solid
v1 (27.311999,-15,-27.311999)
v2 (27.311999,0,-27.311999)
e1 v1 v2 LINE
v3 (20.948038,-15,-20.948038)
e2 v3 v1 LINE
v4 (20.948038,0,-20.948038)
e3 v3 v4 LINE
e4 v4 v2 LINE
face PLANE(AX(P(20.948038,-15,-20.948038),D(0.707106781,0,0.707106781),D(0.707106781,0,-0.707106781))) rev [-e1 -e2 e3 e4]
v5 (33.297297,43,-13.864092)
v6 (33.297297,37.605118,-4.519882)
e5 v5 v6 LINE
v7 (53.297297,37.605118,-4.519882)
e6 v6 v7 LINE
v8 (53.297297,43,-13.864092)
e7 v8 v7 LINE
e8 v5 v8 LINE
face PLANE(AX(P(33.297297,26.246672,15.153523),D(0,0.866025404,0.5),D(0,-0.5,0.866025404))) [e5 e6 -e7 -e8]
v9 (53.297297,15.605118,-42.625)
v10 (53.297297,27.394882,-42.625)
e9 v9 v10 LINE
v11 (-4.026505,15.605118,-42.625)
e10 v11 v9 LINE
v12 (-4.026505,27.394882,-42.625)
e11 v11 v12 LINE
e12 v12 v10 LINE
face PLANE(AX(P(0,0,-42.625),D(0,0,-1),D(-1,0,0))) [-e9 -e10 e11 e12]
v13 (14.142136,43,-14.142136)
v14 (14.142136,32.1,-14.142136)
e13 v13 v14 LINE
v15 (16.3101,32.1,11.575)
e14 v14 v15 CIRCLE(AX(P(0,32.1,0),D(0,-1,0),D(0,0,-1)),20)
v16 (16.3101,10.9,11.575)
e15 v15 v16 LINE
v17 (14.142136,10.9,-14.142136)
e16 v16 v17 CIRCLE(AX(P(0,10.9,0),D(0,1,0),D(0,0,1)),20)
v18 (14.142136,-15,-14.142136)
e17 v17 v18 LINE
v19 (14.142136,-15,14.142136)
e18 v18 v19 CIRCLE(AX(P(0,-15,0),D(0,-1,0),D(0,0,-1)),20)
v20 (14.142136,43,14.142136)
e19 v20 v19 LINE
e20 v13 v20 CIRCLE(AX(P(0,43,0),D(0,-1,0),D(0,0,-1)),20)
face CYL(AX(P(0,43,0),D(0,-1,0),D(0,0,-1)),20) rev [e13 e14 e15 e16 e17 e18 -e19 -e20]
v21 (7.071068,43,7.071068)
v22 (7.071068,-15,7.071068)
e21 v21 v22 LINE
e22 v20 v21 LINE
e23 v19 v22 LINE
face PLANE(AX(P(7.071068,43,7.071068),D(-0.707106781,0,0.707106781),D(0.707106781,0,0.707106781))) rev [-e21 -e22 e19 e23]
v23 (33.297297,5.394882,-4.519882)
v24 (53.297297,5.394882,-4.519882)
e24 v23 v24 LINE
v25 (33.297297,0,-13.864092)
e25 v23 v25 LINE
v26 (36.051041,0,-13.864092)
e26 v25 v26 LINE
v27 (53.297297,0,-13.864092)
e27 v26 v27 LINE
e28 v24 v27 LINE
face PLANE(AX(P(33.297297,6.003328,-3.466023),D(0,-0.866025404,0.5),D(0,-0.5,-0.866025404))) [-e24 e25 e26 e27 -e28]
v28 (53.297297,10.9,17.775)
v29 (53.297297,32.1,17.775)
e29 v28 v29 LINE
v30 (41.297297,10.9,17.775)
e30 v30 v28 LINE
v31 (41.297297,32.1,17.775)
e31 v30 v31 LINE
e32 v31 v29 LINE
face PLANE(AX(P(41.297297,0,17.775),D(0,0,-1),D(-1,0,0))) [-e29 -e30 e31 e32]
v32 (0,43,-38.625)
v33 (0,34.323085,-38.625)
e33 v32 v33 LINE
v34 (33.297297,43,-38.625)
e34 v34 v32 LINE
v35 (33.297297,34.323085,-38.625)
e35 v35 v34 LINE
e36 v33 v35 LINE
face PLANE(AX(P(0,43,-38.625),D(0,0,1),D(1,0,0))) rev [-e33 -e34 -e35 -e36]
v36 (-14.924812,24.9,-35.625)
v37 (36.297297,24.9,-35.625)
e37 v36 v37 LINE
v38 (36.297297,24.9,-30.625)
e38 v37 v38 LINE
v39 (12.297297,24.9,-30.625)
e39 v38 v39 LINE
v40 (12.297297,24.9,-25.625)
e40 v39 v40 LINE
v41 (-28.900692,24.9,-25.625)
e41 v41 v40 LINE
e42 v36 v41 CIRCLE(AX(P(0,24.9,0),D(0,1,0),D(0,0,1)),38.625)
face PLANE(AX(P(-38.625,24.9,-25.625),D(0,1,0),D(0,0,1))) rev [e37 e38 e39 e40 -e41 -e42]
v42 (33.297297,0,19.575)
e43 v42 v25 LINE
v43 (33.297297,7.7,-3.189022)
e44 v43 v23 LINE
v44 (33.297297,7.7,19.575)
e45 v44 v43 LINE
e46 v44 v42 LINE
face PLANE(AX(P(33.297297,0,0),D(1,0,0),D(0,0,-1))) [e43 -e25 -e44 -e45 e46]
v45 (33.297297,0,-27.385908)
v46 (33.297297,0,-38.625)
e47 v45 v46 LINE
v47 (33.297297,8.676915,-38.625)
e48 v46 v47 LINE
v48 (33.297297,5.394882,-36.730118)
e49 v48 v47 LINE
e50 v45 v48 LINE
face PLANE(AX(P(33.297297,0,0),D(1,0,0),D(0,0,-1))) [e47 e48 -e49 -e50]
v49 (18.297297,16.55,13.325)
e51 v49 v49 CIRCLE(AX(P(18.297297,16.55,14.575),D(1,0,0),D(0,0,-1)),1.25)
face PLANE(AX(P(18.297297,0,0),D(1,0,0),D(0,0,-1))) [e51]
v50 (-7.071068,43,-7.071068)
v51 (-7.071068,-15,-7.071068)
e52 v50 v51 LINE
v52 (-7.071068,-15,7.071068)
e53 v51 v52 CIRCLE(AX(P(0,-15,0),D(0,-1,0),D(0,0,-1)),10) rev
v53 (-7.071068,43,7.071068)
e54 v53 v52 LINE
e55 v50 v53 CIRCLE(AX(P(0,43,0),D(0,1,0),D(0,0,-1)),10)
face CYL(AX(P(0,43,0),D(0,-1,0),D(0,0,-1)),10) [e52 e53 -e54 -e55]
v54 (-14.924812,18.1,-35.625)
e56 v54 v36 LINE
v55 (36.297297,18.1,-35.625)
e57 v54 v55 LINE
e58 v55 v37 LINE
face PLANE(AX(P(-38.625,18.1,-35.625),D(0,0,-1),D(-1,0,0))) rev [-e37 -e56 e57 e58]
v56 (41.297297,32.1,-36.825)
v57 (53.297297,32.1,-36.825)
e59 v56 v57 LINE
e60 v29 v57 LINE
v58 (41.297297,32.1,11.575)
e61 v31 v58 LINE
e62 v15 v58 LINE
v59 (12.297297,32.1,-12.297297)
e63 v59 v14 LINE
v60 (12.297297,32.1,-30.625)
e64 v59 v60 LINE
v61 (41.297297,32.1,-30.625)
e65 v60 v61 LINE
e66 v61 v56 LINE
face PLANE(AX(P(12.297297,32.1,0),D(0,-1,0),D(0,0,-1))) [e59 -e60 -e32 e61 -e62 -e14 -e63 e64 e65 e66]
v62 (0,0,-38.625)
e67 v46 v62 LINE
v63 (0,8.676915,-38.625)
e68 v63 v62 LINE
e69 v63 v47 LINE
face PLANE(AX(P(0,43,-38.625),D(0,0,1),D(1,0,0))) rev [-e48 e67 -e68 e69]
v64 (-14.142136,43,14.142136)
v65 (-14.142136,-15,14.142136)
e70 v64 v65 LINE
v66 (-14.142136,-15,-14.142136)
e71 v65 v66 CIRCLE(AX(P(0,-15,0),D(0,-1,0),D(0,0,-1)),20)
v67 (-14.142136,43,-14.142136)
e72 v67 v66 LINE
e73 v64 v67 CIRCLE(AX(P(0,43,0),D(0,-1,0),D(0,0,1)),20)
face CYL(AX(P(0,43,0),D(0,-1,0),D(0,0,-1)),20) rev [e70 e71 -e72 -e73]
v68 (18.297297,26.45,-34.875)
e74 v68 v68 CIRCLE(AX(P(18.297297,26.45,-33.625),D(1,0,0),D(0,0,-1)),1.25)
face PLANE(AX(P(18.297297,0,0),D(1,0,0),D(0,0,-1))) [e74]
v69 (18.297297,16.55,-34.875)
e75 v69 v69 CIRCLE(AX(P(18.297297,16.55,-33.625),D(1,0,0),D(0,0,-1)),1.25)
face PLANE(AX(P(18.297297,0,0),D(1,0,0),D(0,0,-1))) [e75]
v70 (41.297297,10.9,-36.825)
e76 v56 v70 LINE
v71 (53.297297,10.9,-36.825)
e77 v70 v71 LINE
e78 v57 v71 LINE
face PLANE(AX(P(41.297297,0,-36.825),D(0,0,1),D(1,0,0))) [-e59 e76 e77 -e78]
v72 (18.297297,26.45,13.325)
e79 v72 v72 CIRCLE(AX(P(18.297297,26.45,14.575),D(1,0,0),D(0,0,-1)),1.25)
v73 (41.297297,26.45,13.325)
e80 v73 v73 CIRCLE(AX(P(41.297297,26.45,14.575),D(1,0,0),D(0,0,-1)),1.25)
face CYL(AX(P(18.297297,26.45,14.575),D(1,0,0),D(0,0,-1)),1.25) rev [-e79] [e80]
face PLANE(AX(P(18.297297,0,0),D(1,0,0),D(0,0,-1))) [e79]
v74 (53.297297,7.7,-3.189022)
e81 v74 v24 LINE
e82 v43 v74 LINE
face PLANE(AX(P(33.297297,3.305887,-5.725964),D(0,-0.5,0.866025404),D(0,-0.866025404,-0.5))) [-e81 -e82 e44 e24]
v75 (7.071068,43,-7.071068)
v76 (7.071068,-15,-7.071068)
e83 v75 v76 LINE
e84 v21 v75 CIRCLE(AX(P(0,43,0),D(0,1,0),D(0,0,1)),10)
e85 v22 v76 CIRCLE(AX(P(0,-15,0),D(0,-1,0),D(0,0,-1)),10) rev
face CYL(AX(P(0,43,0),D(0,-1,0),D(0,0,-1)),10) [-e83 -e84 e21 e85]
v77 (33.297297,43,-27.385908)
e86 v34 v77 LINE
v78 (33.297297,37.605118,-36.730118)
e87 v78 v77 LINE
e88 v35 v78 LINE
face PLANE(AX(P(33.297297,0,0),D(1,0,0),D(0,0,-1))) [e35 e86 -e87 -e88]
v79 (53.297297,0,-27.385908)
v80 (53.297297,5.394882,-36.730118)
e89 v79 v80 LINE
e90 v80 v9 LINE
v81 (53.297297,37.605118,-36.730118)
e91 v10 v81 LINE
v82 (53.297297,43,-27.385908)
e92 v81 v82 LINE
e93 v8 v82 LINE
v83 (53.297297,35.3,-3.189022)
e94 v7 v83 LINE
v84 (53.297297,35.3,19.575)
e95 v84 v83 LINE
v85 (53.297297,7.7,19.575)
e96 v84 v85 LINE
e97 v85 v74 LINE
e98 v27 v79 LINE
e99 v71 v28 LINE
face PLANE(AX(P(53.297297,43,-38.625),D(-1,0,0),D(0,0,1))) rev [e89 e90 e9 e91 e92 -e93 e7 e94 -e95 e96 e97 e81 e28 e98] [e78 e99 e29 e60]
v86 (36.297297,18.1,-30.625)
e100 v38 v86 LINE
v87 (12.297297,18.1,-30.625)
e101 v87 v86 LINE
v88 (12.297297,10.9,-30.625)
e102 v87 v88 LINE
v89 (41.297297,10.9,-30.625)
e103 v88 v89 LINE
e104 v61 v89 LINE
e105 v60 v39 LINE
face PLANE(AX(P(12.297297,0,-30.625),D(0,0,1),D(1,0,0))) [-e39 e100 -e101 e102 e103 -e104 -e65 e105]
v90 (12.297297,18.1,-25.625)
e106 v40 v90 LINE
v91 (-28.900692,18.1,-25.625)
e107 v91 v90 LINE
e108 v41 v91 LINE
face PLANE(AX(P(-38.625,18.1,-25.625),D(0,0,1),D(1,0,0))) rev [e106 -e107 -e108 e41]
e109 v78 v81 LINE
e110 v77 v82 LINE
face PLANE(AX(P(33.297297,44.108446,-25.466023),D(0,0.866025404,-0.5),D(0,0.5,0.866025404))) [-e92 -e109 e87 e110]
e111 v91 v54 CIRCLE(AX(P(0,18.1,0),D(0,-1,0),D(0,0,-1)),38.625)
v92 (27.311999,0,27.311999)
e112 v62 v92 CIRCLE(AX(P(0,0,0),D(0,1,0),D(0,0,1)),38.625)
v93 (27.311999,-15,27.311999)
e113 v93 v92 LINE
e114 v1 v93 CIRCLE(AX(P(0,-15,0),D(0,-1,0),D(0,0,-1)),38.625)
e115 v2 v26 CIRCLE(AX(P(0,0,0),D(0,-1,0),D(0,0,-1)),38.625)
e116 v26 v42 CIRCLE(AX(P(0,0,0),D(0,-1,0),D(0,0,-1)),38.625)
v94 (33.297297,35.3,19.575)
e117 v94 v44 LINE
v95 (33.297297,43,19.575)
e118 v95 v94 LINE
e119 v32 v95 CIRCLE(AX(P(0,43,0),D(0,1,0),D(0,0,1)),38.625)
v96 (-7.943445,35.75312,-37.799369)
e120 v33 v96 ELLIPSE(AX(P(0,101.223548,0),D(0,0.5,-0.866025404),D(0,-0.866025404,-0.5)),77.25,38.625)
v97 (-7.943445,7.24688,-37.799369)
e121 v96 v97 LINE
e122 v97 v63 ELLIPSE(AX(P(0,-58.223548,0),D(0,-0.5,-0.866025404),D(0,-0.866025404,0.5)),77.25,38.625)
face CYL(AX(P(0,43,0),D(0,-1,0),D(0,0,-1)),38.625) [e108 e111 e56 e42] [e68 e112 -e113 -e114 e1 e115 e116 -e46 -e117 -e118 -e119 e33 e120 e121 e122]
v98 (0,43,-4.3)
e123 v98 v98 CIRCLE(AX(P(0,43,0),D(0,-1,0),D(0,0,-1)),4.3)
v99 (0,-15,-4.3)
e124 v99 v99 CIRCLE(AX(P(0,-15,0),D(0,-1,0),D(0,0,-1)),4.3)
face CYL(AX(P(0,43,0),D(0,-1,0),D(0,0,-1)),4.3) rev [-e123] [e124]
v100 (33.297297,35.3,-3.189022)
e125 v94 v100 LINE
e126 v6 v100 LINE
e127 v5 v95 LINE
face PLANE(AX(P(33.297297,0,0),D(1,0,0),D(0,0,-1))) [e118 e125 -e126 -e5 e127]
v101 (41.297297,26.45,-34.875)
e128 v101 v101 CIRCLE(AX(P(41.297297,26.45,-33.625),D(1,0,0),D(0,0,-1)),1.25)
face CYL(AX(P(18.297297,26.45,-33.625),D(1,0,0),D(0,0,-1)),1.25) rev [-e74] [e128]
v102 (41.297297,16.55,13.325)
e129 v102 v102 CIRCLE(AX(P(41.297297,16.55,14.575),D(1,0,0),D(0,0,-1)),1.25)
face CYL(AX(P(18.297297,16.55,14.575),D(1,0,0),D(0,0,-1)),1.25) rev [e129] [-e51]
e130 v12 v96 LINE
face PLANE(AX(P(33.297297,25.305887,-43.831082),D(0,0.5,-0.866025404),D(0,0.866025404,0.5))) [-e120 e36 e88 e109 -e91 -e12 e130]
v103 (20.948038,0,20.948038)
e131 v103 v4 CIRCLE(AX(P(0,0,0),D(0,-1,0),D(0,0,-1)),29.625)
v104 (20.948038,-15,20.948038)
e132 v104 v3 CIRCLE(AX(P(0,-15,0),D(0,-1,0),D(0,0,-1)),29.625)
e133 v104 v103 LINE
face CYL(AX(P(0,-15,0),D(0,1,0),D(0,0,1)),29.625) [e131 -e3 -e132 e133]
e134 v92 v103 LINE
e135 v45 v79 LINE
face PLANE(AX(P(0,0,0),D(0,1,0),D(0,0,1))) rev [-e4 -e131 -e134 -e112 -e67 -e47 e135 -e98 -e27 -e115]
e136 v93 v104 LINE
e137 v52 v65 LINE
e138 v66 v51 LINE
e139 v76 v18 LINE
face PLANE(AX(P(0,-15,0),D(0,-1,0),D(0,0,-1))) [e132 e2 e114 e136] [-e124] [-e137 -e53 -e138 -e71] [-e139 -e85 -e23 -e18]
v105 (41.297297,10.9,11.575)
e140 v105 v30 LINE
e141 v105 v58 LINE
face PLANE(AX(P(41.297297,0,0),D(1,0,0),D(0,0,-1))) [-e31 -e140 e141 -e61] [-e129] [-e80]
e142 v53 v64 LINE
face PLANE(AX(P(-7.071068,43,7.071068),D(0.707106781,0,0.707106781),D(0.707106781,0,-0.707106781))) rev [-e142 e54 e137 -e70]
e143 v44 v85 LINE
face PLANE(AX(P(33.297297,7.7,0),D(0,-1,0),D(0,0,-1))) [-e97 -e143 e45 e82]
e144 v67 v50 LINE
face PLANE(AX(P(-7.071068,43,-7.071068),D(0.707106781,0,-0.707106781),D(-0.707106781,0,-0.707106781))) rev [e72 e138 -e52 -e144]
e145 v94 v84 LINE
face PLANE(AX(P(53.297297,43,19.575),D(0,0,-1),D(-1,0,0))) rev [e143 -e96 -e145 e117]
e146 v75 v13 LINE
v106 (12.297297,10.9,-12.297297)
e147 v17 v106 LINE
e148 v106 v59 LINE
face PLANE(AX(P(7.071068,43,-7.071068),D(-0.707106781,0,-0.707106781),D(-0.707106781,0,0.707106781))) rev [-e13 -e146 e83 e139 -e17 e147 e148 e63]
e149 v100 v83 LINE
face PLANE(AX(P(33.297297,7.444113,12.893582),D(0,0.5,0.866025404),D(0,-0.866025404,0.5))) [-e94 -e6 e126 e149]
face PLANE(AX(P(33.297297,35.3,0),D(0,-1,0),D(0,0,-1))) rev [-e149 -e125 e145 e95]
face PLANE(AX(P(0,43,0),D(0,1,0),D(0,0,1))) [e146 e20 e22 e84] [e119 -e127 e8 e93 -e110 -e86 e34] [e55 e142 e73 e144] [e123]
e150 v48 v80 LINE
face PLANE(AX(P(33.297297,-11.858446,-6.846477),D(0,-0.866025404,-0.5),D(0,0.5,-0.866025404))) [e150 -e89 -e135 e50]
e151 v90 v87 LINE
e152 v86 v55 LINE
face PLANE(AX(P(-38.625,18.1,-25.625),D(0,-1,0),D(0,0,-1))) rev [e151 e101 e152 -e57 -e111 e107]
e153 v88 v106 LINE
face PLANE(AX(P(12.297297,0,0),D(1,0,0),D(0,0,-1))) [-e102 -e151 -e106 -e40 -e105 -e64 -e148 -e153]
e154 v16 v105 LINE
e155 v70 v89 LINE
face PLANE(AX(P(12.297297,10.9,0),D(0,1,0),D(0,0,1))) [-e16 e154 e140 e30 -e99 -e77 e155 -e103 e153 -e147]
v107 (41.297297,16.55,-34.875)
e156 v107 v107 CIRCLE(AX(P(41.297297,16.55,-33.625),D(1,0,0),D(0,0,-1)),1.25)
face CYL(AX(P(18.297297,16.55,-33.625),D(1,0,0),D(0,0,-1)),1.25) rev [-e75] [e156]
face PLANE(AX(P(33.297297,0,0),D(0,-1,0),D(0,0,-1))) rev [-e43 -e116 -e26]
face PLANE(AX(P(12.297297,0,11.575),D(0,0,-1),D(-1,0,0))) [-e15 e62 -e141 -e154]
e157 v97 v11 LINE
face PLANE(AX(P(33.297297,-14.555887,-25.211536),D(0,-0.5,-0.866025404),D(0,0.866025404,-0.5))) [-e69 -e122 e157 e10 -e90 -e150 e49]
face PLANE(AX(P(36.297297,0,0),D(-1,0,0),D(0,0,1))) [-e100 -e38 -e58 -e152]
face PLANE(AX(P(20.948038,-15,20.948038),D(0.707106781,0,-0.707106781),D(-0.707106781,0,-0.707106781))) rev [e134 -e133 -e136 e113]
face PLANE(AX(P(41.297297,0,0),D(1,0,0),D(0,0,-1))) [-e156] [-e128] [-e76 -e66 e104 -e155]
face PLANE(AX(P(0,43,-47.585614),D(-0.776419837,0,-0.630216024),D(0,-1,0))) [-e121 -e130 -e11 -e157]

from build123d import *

# Parameters (mm, degrees)
BOSS_EXTRUDE1_DEPTH     = 43
BOSS_EXTRUDE2_START     = 15
BOSS_EXTRUDE2_DEPTH     = 15
SKETCH5_W               = 42.2
SKETCH5_H               = 21.2
CUT_EXTRUDE1_DEPTH      = 41
SKETCH5_5_W             = 6.2
SKETCH5_5_H             = 21.2
SKETCH5_5_R             = 1.25
CUT_EXTRUDE2_DEPTH      = 12
SKETCH5_6_R             = 1.25
CUT_EXTRUDE3_DEPTH      = 35
CUT_EXTRUDE4_DEPTH      = 88.729655833
CUT_EXTRUDE4_DEPTH_BACK = 88.729655833
SKETCH6_R               = 4.3
CUT_EXTRUDE5_START      = -5
SKETCH7_W               = 10
SKETCH7_H               = 6.8
CUT_EXTRUDE5_DEPTH      = 94.632977309
CUT_EXTRUDE9_DEPTH      = 20
BOSS_EXTRUDE3_DEPTH     = 53.297297


with BuildPart() as part:
    # Sketch1 → Boss-Extrude1 (new body)
    with BuildSketch(Plane(origin=(0, 0, 0), x_dir=(1, 0, 0), z_dir=(0, 1, 0))):
        with BuildLine():
            Line((0, 38.625), (53.297297188, 38.625))
            Line((53.297297188, 38.625), (53.297297188, -19.575))
            Line((53.297297188, -19.575), (33.297297188, -19.575))
            ThreePointArc((33.297297188, -19.575), (-33.525922806, -19.180800948), (0, 38.625))
        make_face()
    extrude(amount=BOSS_EXTRUDE1_DEPTH)

    # Sketch4 → Boss-Extrude2 (add)
    with BuildSketch(Plane.XZ.offset(BOSS_EXTRUDE2_START)):
        with BuildLine():
            Line((20.948038393, 20.948038393), (27.311999423, 27.311999423))
            ThreePointArc((27.311999423, 27.311999423), (38.625, 0), (27.311999423, -27.311999423))
            Line((27.311999423, -27.311999423), (20.948038393, -20.948038393))
            ThreePointArc((20.948038393, -20.948038393), (-29.625, 0), (20.948038393, 20.948038393))
        make_face()
    extrude(amount=-BOSS_EXTRUDE2_DEPTH)

    # Sketch5 → Cut-Extrude1 (cut)
    with BuildSketch(Plane(origin=(53.297297188, 0, 0), x_dir=(0, 0, -1), z_dir=(1, 0, 0))):
        with Locations((9.525, 21.5)):
            Rectangle(SKETCH5_W, SKETCH5_H)
    extrude(amount=-CUT_EXTRUDE1_DEPTH, mode=Mode.SUBTRACT)

    # Sketch5<5> → Cut-Extrude2 (cut)
    # profile 1 of 2: a face of its own
    with BuildSketch(Plane(origin=(53.297297188, 0, 0), x_dir=(0, 0, -1), z_dir=(1, 0, 0))):
        with Locations((-14.675, 21.5)):
            Rectangle(SKETCH5_5_W, SKETCH5_5_H)
        with Locations((-14.575, 16.55)):
            Circle(SKETCH5_5_R, mode=Mode.SUBTRACT)
        with Locations((-14.575, 26.45)):
            Circle(SKETCH5_5_R, mode=Mode.SUBTRACT)
    # profile 2 of 2: a face of its own
    with BuildSketch(Plane(origin=(53.297297188, 0, 0), x_dir=(0, 0, -1), z_dir=(1, 0, 0))):
        with Locations((33.725, 21.5)):
            Rectangle(SKETCH5_5_W, SKETCH5_5_H)
        with Locations((33.625, 26.45)):
            Circle(SKETCH5_5_R, mode=Mode.SUBTRACT)
        with Locations((33.625, 16.55)):
            Circle(SKETCH5_5_R, mode=Mode.SUBTRACT)
    extrude(amount=-CUT_EXTRUDE2_DEPTH, mode=Mode.SUBTRACT)

    # Sketch5<6> → Cut-Extrude3 (cut)
    with BuildSketch(Plane(origin=(53.297297188, 0, 0), x_dir=(0, 0, -1), z_dir=(1, 0, 0))):
        with Locations((33.625, 26.45)):
            Circle(SKETCH5_6_R)
        with Locations((33.625, 16.55)):
            Circle(SKETCH5_6_R)
        with Locations((-14.575, 26.45)):
            Circle(SKETCH5_6_R)
        with Locations((-14.575, 16.55)):
            Circle(SKETCH5_6_R)
    extrude(amount=-CUT_EXTRUDE3_DEPTH, mode=Mode.SUBTRACT)

    # Sketch6 → Cut-Extrude4 (cut, two sides: drawn at the far end of the back side and taken through both)
    with BuildSketch(Plane.XZ.offset(15).offset(-CUT_EXTRUDE4_DEPTH_BACK)):
        with Locations(Location((0, 0, 0), (0, 0, 270))):
            Circle(SKETCH6_R)
        with BuildLine():
            Line((7.071067812, 7.071067812), (14.142135624, 14.142135624))
            ThreePointArc((14.142135624, 14.142135624), (20, 0), (14.142135624, -14.142135624))
            Line((14.142135624, -14.142135624), (7.071067812, -7.071067812))
            ThreePointArc((7.071067812, -7.071067812), (10, 0), (7.071067812, 7.071067812))
        make_face()
        with BuildLine():
            Line((-7.071067812, -7.071067812), (-14.142135624, -14.142135624))
            ThreePointArc((-14.142135624, -14.142135624), (-20, 0), (-14.142135624, 14.142135624))
            Line((-14.142135624, 14.142135624), (-7.071067812, 7.071067812))
            ThreePointArc((-7.071067812, 7.071067812), (-10, 0), (-7.071067812, -7.071067812))
        make_face()
    extrude(amount=CUT_EXTRUDE4_DEPTH + CUT_EXTRUDE4_DEPTH_BACK, mode=Mode.SUBTRACT)

    # Sketch7 → Cut-Extrude5 (cut, through all)
    with BuildSketch(Plane(origin=(41.297297188, 0, 0), x_dir=(0, 0, -1), z_dir=(1, 0, 0)).offset(CUT_EXTRUDE5_START)):
        with Locations((30.625, 21.5)):
            Rectangle(SKETCH7_W, SKETCH7_H)
    extrude(amount=-CUT_EXTRUDE5_DEPTH, mode=Mode.SUBTRACT)

    # Sketch9 → Cut-Extrude9 (cut)
    with BuildSketch(Plane(origin=(53.297297188, 0, 0), x_dir=(0, 0, -1), z_dir=(1, 0, 0))):
        Polygon((38.625, 43), (27.385907637, 43), (36.730117767, 37.605117767), (38.625, 34.323085464), align=None)
        Polygon((4.519882233, 37.605117767), (13.864092363, 43), (-19.575, 43), (-19.575, 35.3), (3.18902187, 35.3), align=None)
        Polygon((3.18902187, 7.7), (-19.575, 7.7), (-19.575, 0), (13.864092363, 0), (4.519882233, 5.394882233), align=None)
        Polygon((38.625, 0), (38.625, 8.676914536), (36.730117767, 5.394882233), (27.385907637, 0), align=None)
    extrude(amount=-CUT_EXTRUDE9_DEPTH, mode=Mode.SUBTRACT)

    # Sketch9<7> → Boss-Extrude3 (add)
    with BuildSketch(Plane(origin=(53.297297188, 0, 0), x_dir=(0, 0, -1), z_dir=(1, 0, 0))):
        Polygon((42.625, 27.394882233), (38.625, 34.323085464), (38.625, 8.676914536), (42.625, 15.605117767), align=None)
    extrude(amount=-BOSS_EXTRUDE3_DEPTH)

    # Chamfer1
    # the kernel refuses this chamfer: 10 mm, written as the material it adds along each edge
    with BuildSketch(Plane(origin=(1.88e-07, 57.509605692, -38.625), x_dir=(-0.9905263247652732, 0, 0.13732297676281435), z_dir=(0, -1, 0))) as chamfer1_piece_1_section:
        with BuildLine():
            Line((8.273915537, 0), (-1.522844477, 9.14873215))
            Line((-1.522844477, 9.14873215), (-1.720949742, 9.121267554))
            ThreePointArc((-1.720949742, 9.121267554), (-0.834678391, 4.564210108), (-0.198105265, -0.027464595))
            Line((-0.198105265, -0.027464595), (0.027464596, -0.198105265))
            ThreePointArc((0.027464596, -0.198105265), (4.132441209, 0.148053406), (8.26005162, -0.199518901))
            Line((8.26005162, -0.199518901), (8.273915537, 0))
        make_face()
    chamfer1_piece_1 = extrude(amount=72.019211383, mode=Mode.PRIVATE)
    chamfer1_piece_1 = split(chamfer1_piece_1, bisect_by=Plane(origin=(-3.347907706, 24.181861257, -44.480038526), z_dir=(0, -0.5000000000000007, 0.8660254037844383)), keep=Keep.TOP, mode=Mode.PRIVATE)
    chamfer1_piece_1 = split(chamfer1_piece_1, bisect_by=Plane(origin=(-3.347907706, 21.5, -42.625), z_dir=(0, 0, 1)), keep=Keep.TOP, mode=Mode.PRIVATE)
    chamfer1_piece_1 = split(chamfer1_piece_1, bisect_by=Plane(origin=(-3.347907706, 18.818138743, -44.480038526), z_dir=(0, 0.5000000000000001, 0.8660254037844386)), keep=Keep.TOP, mode=Mode.PRIVATE)
    add(chamfer1_piece_1)


solid = part.part
